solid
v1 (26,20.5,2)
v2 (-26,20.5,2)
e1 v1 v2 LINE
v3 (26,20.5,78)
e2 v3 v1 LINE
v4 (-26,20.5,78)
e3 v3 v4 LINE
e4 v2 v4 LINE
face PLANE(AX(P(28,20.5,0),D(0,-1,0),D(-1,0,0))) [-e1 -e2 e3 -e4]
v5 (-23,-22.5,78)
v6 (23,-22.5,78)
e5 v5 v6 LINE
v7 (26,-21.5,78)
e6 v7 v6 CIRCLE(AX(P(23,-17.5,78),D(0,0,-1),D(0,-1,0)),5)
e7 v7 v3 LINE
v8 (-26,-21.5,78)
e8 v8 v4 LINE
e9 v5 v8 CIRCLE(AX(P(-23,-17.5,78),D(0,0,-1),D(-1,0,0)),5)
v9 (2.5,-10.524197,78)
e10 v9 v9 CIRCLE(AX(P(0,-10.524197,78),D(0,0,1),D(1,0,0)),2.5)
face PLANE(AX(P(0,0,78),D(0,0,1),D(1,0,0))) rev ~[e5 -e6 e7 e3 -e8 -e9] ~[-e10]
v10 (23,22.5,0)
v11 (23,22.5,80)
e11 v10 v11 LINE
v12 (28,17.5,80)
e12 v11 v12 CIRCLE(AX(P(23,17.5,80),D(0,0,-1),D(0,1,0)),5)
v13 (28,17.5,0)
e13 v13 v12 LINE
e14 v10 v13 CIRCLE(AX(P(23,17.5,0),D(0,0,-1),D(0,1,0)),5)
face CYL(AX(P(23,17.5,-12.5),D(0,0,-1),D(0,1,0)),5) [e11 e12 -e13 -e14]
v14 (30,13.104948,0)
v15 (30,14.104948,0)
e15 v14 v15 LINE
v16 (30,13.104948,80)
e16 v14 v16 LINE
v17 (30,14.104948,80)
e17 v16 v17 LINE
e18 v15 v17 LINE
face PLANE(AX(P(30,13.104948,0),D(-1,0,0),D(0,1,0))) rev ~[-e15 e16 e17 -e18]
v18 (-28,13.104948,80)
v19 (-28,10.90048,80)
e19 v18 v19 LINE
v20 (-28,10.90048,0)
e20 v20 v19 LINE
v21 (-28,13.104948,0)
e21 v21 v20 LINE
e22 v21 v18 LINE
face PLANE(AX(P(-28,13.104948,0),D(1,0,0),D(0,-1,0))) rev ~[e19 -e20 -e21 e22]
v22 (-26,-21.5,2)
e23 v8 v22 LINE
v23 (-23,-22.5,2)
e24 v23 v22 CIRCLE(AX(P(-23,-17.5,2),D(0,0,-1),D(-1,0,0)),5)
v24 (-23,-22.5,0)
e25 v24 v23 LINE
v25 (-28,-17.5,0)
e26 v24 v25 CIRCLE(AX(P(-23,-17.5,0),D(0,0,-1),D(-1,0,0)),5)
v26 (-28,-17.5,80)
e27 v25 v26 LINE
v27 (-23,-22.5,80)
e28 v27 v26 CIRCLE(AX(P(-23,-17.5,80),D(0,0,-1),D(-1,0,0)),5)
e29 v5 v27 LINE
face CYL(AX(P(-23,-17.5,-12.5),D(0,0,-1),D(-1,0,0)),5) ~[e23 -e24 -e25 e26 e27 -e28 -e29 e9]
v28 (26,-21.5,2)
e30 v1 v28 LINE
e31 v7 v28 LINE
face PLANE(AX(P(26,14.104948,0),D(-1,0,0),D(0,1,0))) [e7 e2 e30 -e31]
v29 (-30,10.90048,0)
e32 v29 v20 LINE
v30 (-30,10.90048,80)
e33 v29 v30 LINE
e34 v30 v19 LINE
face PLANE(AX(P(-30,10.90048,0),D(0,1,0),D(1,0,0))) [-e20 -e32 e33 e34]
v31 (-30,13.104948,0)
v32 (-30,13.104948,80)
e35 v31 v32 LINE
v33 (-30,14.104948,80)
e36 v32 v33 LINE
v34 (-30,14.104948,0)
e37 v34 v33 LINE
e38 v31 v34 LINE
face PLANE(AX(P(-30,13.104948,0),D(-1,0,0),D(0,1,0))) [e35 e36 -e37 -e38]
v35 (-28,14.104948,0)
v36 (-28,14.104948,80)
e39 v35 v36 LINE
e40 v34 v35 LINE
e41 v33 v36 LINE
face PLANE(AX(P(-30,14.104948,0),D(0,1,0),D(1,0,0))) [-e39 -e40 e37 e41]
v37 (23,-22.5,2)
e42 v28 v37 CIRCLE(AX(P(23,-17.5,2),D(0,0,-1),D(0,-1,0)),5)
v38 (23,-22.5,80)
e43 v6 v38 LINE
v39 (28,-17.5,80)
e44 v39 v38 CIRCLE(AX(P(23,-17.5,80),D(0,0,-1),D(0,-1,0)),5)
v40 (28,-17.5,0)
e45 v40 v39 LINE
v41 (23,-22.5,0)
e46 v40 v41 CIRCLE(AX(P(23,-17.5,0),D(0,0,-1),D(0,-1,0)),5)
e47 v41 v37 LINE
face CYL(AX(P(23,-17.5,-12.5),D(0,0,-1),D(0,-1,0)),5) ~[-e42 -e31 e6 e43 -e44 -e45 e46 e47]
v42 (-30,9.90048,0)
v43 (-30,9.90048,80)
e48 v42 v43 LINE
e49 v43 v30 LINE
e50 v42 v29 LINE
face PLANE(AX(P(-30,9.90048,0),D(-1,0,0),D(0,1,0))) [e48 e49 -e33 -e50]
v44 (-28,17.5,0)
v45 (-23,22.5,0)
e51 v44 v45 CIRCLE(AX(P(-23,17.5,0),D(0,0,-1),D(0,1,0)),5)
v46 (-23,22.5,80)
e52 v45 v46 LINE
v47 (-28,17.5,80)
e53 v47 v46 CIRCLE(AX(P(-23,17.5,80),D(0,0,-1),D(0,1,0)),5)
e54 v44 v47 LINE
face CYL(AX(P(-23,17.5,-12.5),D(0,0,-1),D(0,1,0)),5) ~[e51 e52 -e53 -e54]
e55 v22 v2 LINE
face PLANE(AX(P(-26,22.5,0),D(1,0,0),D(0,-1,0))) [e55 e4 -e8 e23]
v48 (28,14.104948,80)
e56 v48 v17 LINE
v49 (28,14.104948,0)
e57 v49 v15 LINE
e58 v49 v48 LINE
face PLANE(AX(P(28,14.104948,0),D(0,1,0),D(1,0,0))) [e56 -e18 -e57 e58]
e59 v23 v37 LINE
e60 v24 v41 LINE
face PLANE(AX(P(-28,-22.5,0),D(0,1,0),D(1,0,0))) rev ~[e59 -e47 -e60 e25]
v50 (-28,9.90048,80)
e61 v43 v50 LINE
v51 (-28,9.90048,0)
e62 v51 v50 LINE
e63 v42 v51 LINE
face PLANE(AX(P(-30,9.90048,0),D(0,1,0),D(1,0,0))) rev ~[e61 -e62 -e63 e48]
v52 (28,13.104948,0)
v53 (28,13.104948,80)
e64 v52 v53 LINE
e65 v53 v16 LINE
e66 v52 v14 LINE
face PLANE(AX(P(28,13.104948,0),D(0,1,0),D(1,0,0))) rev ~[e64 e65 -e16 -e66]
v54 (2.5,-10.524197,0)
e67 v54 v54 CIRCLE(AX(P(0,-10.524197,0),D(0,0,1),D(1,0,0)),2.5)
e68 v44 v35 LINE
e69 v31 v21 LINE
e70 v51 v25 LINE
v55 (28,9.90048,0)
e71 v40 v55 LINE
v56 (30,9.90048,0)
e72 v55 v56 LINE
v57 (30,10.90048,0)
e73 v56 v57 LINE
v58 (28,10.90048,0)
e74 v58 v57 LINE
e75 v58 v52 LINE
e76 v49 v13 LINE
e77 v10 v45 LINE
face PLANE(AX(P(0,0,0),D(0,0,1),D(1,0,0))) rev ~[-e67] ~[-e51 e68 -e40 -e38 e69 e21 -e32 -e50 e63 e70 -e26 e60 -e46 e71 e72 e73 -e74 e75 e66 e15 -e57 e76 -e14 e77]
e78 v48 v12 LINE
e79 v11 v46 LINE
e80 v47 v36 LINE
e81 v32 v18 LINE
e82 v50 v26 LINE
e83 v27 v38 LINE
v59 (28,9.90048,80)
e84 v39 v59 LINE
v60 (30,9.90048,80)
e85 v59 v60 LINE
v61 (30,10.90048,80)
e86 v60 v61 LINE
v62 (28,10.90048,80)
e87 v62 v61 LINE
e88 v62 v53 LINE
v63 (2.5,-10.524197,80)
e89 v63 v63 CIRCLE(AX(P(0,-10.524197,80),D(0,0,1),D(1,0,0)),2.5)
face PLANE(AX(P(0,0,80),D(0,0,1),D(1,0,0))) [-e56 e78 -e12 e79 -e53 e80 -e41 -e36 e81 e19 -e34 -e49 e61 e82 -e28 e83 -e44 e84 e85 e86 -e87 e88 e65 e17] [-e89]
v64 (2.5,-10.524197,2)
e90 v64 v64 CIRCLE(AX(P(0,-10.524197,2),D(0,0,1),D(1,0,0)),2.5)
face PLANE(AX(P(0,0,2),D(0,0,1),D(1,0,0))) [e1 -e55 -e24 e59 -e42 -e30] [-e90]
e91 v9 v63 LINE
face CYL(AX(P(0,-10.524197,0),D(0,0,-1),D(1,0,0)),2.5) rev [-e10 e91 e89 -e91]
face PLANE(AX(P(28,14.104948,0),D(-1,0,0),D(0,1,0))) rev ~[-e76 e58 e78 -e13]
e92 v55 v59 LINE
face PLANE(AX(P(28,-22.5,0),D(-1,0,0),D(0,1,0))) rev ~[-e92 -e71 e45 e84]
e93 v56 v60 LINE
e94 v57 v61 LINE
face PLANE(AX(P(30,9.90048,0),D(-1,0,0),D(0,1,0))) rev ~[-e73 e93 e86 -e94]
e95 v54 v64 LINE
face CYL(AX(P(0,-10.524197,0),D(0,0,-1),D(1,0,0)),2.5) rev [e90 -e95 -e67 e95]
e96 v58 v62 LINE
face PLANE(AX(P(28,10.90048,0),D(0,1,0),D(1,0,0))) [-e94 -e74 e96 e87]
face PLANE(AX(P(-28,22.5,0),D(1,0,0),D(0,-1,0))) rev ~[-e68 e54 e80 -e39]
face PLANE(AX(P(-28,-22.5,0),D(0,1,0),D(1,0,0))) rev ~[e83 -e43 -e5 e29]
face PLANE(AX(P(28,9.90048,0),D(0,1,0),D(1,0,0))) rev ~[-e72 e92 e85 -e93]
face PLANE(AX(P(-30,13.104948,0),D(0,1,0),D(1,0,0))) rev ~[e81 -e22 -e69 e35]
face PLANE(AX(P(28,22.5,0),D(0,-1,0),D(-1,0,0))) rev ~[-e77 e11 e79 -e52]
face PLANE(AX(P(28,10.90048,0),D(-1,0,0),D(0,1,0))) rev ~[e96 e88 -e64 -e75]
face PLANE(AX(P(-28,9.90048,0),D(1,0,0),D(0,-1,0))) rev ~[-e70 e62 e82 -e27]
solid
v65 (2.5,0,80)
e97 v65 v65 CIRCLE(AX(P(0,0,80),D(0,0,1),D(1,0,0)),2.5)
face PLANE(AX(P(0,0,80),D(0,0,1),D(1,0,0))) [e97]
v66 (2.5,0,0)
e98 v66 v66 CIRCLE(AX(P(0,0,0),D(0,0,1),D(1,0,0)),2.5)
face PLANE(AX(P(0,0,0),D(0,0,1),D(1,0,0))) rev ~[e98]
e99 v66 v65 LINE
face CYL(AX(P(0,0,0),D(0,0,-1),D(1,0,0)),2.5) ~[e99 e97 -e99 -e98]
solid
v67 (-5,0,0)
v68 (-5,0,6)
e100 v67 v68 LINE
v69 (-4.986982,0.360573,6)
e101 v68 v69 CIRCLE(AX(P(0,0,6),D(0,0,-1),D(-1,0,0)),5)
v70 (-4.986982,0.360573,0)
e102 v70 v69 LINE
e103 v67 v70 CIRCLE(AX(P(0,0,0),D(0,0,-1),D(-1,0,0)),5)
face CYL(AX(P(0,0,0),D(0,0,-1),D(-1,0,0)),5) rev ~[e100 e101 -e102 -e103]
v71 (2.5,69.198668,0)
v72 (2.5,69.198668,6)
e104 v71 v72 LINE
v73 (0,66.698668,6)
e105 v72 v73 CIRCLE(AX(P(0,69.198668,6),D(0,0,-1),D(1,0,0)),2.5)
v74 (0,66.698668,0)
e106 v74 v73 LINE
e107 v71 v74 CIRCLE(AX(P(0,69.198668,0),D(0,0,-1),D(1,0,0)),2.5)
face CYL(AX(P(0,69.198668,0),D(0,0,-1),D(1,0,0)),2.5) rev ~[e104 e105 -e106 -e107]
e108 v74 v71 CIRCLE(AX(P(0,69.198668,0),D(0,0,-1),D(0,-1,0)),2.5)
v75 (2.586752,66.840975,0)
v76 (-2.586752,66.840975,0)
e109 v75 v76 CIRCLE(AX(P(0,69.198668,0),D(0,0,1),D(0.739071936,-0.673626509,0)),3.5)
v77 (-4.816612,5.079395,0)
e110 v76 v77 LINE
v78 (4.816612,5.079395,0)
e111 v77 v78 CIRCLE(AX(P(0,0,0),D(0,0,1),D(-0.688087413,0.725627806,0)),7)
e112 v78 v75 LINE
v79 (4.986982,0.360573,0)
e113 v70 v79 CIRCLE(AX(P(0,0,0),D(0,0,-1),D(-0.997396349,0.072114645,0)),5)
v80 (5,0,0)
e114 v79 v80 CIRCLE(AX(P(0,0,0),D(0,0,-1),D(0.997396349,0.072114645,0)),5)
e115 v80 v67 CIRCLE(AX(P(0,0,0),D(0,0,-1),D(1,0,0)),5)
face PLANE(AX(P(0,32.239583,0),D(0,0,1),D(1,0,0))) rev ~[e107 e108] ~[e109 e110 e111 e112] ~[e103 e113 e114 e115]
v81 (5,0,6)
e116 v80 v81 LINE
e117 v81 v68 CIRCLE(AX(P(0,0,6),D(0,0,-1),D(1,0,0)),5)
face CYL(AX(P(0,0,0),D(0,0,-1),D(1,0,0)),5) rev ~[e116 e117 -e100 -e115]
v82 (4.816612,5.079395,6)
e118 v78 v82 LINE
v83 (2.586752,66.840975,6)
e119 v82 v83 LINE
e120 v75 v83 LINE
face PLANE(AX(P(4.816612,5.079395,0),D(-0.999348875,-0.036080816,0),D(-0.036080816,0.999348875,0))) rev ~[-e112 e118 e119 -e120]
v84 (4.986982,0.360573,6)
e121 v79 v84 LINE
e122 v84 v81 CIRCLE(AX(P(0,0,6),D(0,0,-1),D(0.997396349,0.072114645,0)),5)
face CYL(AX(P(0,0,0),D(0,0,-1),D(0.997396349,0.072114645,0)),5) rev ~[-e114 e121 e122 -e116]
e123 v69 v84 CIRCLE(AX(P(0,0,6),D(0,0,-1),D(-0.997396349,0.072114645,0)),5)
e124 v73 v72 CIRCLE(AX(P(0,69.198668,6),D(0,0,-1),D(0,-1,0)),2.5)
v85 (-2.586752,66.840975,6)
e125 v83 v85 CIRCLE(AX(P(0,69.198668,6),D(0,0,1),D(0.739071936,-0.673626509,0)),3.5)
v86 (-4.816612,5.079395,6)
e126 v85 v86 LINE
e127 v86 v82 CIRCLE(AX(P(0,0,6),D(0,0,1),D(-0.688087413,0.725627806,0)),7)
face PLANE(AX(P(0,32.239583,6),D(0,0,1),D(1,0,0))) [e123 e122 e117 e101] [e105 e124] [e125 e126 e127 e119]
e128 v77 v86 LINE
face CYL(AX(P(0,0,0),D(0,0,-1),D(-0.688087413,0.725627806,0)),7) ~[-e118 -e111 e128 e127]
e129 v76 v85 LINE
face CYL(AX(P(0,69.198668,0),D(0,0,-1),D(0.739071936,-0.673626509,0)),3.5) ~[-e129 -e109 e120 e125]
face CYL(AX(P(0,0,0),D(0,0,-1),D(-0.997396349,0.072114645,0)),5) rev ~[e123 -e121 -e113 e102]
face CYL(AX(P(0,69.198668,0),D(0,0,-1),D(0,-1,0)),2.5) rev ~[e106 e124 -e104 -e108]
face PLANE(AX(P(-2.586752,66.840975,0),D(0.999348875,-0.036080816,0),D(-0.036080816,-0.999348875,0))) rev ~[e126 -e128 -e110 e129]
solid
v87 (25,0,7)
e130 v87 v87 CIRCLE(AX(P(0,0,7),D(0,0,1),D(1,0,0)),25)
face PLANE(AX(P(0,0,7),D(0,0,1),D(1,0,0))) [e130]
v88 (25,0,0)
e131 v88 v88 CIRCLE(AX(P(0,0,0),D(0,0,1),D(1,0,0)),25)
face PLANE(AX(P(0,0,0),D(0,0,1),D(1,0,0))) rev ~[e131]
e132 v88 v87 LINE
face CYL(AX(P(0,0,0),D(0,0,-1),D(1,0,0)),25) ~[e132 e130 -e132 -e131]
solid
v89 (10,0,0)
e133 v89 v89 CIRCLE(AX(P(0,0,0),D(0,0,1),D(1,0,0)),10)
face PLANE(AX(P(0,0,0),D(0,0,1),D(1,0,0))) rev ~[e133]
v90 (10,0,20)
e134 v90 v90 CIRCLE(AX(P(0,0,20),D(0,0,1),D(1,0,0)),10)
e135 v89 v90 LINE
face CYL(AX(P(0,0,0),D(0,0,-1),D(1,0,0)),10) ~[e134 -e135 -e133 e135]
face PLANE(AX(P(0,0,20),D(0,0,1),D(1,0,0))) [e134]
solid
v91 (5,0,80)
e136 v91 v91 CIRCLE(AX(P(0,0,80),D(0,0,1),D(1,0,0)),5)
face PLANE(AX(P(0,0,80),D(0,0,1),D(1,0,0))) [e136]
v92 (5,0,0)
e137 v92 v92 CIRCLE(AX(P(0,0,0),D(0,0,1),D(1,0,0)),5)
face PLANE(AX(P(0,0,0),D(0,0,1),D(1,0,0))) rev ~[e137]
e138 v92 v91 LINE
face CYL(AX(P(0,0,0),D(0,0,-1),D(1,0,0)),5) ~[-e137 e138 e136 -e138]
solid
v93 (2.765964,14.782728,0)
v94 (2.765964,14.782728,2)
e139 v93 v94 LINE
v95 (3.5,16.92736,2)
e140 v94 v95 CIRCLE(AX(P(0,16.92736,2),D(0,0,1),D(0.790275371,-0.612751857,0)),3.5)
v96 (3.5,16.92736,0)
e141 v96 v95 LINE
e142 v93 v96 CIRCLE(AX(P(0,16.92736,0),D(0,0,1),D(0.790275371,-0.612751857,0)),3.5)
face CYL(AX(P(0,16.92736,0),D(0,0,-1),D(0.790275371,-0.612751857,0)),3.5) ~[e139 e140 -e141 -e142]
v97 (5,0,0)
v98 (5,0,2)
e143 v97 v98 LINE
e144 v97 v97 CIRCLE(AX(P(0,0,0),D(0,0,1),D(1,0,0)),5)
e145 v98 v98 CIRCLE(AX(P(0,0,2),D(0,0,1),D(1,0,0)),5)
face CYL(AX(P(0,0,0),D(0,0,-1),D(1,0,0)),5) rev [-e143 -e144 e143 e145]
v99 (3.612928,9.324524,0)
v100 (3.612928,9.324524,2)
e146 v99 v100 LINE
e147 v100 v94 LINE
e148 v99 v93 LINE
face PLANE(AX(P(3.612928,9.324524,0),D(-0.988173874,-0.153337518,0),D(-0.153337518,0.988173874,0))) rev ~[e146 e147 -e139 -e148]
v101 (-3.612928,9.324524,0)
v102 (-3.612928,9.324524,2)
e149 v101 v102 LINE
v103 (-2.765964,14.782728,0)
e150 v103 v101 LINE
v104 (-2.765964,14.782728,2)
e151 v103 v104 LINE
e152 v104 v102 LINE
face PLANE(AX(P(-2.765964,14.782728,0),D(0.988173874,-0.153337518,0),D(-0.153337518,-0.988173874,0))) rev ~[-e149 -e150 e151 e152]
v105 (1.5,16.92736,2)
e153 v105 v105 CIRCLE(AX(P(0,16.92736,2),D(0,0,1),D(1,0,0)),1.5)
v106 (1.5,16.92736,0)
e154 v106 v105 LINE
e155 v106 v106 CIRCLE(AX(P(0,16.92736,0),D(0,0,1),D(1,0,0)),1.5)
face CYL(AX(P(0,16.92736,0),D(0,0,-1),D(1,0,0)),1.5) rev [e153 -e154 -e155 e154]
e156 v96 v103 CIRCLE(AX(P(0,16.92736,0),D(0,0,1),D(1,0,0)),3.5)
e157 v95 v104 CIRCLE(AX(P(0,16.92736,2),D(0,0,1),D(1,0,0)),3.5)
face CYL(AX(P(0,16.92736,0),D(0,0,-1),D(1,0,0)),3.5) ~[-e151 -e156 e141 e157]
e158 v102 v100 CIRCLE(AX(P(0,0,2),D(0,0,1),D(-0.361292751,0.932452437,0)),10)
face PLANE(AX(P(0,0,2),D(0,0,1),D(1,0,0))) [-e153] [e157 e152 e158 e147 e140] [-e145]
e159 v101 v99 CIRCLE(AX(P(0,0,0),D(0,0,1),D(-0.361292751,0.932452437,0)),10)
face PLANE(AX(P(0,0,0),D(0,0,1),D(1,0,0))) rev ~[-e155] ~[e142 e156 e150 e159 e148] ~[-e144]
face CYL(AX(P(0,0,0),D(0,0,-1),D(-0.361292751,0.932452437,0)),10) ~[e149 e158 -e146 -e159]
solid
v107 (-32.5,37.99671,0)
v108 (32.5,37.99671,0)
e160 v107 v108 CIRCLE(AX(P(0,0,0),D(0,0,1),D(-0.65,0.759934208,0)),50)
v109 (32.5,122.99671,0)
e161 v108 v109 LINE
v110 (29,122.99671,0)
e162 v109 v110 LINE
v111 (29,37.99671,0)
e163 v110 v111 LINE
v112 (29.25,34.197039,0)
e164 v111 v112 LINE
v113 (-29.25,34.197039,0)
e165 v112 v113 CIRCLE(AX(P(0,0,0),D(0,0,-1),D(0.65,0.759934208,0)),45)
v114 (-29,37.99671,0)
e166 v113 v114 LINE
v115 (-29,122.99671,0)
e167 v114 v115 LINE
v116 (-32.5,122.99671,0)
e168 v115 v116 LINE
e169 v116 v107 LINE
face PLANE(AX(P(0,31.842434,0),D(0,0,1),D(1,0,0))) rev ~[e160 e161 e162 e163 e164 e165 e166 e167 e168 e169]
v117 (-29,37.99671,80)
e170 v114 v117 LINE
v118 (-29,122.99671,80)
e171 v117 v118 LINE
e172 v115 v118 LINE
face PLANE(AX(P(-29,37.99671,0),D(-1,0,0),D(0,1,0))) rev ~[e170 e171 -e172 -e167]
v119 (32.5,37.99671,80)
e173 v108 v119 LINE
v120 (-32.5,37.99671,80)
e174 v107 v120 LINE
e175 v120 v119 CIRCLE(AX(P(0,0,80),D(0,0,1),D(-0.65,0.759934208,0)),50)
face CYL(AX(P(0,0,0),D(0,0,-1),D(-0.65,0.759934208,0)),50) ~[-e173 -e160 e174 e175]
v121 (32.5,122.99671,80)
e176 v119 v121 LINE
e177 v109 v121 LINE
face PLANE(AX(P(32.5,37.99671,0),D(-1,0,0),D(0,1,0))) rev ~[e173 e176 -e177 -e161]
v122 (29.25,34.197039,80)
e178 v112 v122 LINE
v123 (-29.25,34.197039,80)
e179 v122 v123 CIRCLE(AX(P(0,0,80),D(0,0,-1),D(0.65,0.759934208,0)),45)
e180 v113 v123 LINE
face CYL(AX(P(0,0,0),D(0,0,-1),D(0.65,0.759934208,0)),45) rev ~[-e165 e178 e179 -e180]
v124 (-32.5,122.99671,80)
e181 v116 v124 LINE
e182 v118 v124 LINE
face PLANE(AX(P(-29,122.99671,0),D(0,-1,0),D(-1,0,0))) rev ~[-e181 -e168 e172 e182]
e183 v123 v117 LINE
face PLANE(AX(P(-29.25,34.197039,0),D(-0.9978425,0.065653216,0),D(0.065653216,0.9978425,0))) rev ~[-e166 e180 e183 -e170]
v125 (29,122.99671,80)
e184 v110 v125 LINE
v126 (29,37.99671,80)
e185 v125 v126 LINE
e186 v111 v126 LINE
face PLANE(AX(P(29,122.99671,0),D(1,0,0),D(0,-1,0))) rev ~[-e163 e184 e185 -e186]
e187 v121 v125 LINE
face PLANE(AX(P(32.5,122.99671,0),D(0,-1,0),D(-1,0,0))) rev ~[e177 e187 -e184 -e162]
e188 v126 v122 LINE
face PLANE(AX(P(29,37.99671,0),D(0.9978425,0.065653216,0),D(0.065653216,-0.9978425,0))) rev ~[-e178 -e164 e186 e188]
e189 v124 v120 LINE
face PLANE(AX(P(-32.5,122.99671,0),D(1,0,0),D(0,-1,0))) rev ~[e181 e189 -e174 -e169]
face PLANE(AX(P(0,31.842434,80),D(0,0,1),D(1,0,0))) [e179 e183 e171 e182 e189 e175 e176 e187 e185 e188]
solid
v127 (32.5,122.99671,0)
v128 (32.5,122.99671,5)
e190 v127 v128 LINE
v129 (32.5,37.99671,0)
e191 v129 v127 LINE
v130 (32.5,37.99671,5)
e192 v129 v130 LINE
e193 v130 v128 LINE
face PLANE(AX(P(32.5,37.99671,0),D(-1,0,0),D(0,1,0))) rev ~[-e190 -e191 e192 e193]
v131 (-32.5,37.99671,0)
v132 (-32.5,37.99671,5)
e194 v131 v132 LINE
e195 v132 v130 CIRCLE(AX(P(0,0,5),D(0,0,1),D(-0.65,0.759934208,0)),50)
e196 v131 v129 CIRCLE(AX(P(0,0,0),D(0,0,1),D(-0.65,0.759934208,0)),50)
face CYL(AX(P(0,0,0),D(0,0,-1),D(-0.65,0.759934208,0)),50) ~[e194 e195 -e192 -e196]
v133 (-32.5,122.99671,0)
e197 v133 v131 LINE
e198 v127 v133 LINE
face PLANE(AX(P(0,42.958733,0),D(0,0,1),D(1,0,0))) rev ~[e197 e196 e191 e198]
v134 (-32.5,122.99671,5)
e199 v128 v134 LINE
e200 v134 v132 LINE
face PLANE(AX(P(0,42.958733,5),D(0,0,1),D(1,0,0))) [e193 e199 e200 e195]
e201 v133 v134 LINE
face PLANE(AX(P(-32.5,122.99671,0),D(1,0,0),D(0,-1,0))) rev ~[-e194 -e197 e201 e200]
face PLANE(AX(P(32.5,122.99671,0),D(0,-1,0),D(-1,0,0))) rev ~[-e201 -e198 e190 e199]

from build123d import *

# Parameters (mm, degrees)
F1_DEPTH     = 80
F3_DEPTH     = 5
F4_R         = 5
F5_DEPTH     = 80
F7_R         = 25
F8_DEPTH     = 7
F10_DEPTH    = 6
F6_R         = 5
F6_R_2       = 1.5
F11_DEPTH    = 2
F12_R        = 2.5
F12_W        = 2
F12_H        = 1
F13_DEPTH    = 80
F14_T        = 2
F14_T3_DEPTH = 84
F15_T1_DEPTH = 105
F16_R        = 2.5
F17_DEPTH    = 80
F18_R        = 10
F19_DEPTH    = 20


# Not quite as in the source:
# - a fillet or chamfer that OpenCascade refuses, or shapes differently, is made with other operations: its cross-section is extruded or revolved along the edge and cut away or added
# - a shell that OpenCascade refuses in one call is made with other operations: the cavity is built on its own and cut out


with BuildPart() as f1:
    # F0 (on Top) → F1 (new body)
    with BuildSketch(Plane.XY):
        with BuildLine():
            Line((-32.5, 122.9967103839), (-32.5, 37.9967103839))
            ThreePointArc((-32.5, 37.9967103839), (0, -50), (32.5, 37.9967103839))
            Line((32.5, 37.9967103839), (32.5, 122.9967103839))
            Line((32.5, 122.9967103839), (29, 122.9967103839))
            Line((29, 122.9967103839), (29, 37.9967103839))
            Line((29, 37.9967103839), (29.25, 34.1970393455))
            ThreePointArc((29.25, 34.1970393455), (0, -45), (-29.25, 34.1970393455))
            Line((-29.25, 34.1970393455), (-29, 37.9967103839))
            Line((-29, 37.9967103839), (-29, 122.9967103839))
            Line((-29, 122.9967103839), (-32.5, 122.9967103839))
        make_face()
    extrude(amount=F1_DEPTH)


with BuildPart() as f3:
    # F2 (on Top) → F3 (new body)
    with BuildSketch(Plane.XY):
        with BuildLine():
            Line((-32.5, 122.9967103839), (-32.5, 37.9967103839))
            ThreePointArc((-32.5, 37.9967103839), (0, -50), (32.5, 37.9967103839))
            Line((32.5, 37.9967103839), (32.5, 122.9967103839))
            Line((32.5, 122.9967103839), (-32.5, 122.9967103839))
        make_face()
    extrude(amount=F3_DEPTH)


with BuildPart() as f5:
    # F4 (on Top) → F5 (new body)
    with BuildSketch(Plane.XY):
        Circle(F4_R)
    extrude(amount=F5_DEPTH)


with BuildPart() as f8:
    # F7 (on Top) → F8 (new body)
    with BuildSketch(Plane.XY):
        Circle(F7_R)
    extrude(amount=F8_DEPTH)


with BuildPart() as f10:
    # F9 (on Top) → F10 (new body)
    with BuildSketch(Plane.XY):
        with BuildLine():
            Line((4.8166118904, 5.0793946389), (2.5867517761, 66.8409752222))
            ThreePointArc((2.5867517761, 66.8409752222), (0, 72.6986680031), (-2.5867517761, 66.8409752222))
            Line((-2.5867517761, 66.8409752222), (-4.8166118904, 5.0793946389))
            ThreePointArc((-4.8166118904, 5.0793946389), (0, -7), (4.8166118904, 5.0793946389))
        make_face()
        with BuildLine():
            ThreePointArc((4.9869817475, 0.3605732245), (4.996744377, 0.1804040778), (5, 0))
            ThreePointArc((5, 0), (0, -5), (-5, 0))
            ThreePointArc((-5, 0), (-4.996744377, 0.1804040778), (-4.9869817475, 0.3605732245))
            ThreePointArc((-4.9869817475, 0.3605732245), (0, 5), (4.9869817475, 0.3605732245))
        make_face(mode=Mode.SUBTRACT)
        with BuildLine():
            ThreePointArc((0, 66.6986680031), (-1.767766953, 70.966434956), (2.5, 69.1986680031))
            ThreePointArc((2.5, 69.1986680031), (1.767766953, 67.4309010501), (0, 66.6986680031))
        make_face(mode=Mode.SUBTRACT)
    extrude(amount=F10_DEPTH)


with BuildPart() as f11:
    # F6 (on Top) → F11 (new body)
    with BuildSketch(Plane.XY):
        with BuildLine():
            ThreePointArc((-3.6129275124, 9.3245243734), (-5.6511381542, -8.2501295482), (10, 0))
            ThreePointArc((10, 0), (8.2501295482, 5.6511381542), (3.6129275124, 9.3245243734))
            ThreePointArc((3.6129275124, 9.3245243734), (0, 10), (-3.6129275124, 9.3245243734))
        make_face()
        Circle(F6_R, mode=Mode.SUBTRACT)
        with BuildLine():
            ThreePointArc((-3.6129275124, 9.3245243734), (0, 10), (3.6129275124, 9.3245243734))
            Line((3.6129275124, 9.3245243734), (2.7659637974, 14.7827281256))
            ThreePointArc((2.7659637974, 14.7827281256), (0, 13.4273596257), (-2.7659637974, 14.7827281256))
            Line((-2.7659637974, 14.7827281256), (-3.6129275124, 9.3245243734))
        make_face()
        with BuildLine():
            ThreePointArc((-2.7659637974, 14.7827281256), (0, 13.4273596257), (2.7659637974, 14.7827281256))
            ThreePointArc((2.7659637974, 14.7827281256), (3.3114100691, 15.7939738333), (3.5, 16.9273596257))
            ThreePointArc((3.5, 16.9273596257), (-1.1333857924, 20.2387696948), (-2.7659637974, 14.7827281256))
        make_face()
        with Locations((0, 16.9273596257)):
            Circle(F6_R_2, mode=Mode.SUBTRACT)
    extrude(amount=F11_DEPTH)


with BuildPart() as f13:
    # F12 (on Top) → F13 (new body)
    with BuildSketch(Plane.XY):
        Polygon((28, 22.5), (-28, 22.5), (-28, 14.1049482152), (-28, 13.1049482152), (-28, 10.9004797414), (-28, 9.9004797414), (-28, -22.5), (28, -22.5), (28, 9.9004797414), (28, 10.9004797414), (28, 13.1049482152), (28, 14.1049482152), align=None)
        with Locations((0, -10.5241974816)):
            Circle(F12_R, mode=Mode.SUBTRACT)
        with Locations((-29, 13.6049482152)):
            Rectangle(F12_W, F12_H)
        with Locations((-29, 10.4004797414)):
            Rectangle(F12_W, F12_H)
        with Locations((29, 13.6049482152)):
            Rectangle(F12_W, F12_H)
        with Locations((29, 10.4004797414)):
            Rectangle(F12_W, F12_H)
    extrude(amount=F13_DEPTH)

    # F14: shell of thickness 2, made by hand


with BuildPart() as f14_core1:
    # F14_t2: copy of F13
    add(f13.part)

    # the walls: a layer under each face that stays
    f14_faces = [f14_core1.faces().sort_by_distance(p)[0] for p in [
        (0, 22.5, 40),
        (-28, 18.3024741076, 40),
        (-29, 14.1049482152, 40),
        (-30, 13.6049482152, 40),
        (-29, 13.1049482152, 40),
        (-28, 12.0027139783, 40),
        (-29, 10.9004797414, 40),
        (-30, 10.4004797414, 40),
        (-29, 9.9004797414, 40),
        (-28, -6.2997601293, 40),
        (28, -6.2997601293, 40),
        (29, 9.9004797414, 40),
        (30, 10.4004797414, 40),
        (29, 10.9004797414, 40),
        (28, 12.0027139783, 40),
        (29, 13.1049482152, 40),
        (30, 13.6049482152, 40),
        (29, 14.1049482152, 40),
        (28, 18.3024741076, 40),
        (0, 0, 0),
        (0, 0, 80),
    ]]
    thicken(f14_faces, amount=-F14_T, mode=Mode.SUBTRACT)

    # F14_s4 → F14_t3 (cut)
    with BuildSketch(Plane.XY.offset(-2)):
        Polygon((-28.02, 14.1249482152), (-26, 14.1049482152), (-26, 12.1049482152), (-28, 12.1049482152), align=None)
        Polygon((-28.02, 13.0849482152), (-28, 15.1049482152), (-26, 15.1049482152), (-26, 13.1049482152), align=None)
        Polygon((-28.02, 10.9204797414), (-26, 10.9004797414), (-26, 8.9004797414), (-28, 8.9004797414), align=None)
        Polygon((-28.02, 9.8804797414), (-28, 11.9004797414), (-26, 11.9004797414), (-26, 9.9004797414), align=None)
        Polygon((28.02, 9.8804797414), (26, 9.9004797414), (26, 11.9004797414), (28, 11.9004797414), align=None)
        Polygon((28.02, 10.9204797414), (28, 8.9004797414), (26, 8.9004797414), (26, 10.9004797414), align=None)
        Polygon((28.02, 13.0849482152), (26, 13.1049482152), (26, 15.1049482152), (28, 15.1049482152), align=None)
        Polygon((28.02, 14.1249482152), (28, 12.1049482152), (26, 12.1049482152), (26, 14.1049482152), align=None)
    extrude(amount=F14_T3_DEPTH, mode=Mode.SUBTRACT)


with BuildPart() as f13_1:
    add(f13.part)

    # what is left inside the walls is the cavity
    f14_cavity = [f14_core1.part.solids().sort_by_distance(p)[0] for p in [
        (0, 20.48, 52.666667),
    ]]
    add(f14_cavity, mode=Mode.SUBTRACT)

    # F15: fillet of radius 5 on 4 edges, made by hand

    # F15_s2 → F15_t1 (cut)
    with BuildSketch(Plane.XY.offset(-12.5)):
        with BuildLine():
            ThreePointArc((-23, 22.5), (-26.5355339059, 21.0355339059), (-28, 17.5))
            Line((-28, 17.5), (-28, 22.5))
            Line((-28, 22.5), (-23, 22.5))
        make_face()
        with BuildLine():
            ThreePointArc((23, 22.5), (26.5355339059, 21.0355339059), (28, 17.5))
            Line((28, 17.5), (28, 22.5))
            Line((28, 22.5), (23, 22.5))
        make_face()
        with BuildLine():
            ThreePointArc((23, -22.5), (26.5355339059, -21.0355339059), (28, -17.5))
            Line((28, -17.5), (28, -22.5))
            Line((28, -22.5), (23, -22.5))
        make_face()
        with BuildLine():
            ThreePointArc((-28, -17.5), (-26.5355339059, -21.0355339059), (-23, -22.5))
            Line((-23, -22.5), (-28, -22.5))
            Line((-28, -22.5), (-28, -17.5))
        make_face()
    extrude(amount=F15_T1_DEPTH, mode=Mode.SUBTRACT)


with BuildPart() as f17:
    # F16 (on Top) → F17 (new body)
    with BuildSketch(Plane.XY):
        Circle(F16_R)
    extrude(amount=F17_DEPTH)


with BuildPart() as f19:
    # F18 (on Top) → F19 (new body)
    with BuildSketch(Plane.XY):
        Circle(F18_R)
    extrude(amount=F19_DEPTH)


solid = Compound([f1.part, f3.part, f5.part, f8.part, f10.part, f11.part, f13_1.part, f17.part, f19.part])
